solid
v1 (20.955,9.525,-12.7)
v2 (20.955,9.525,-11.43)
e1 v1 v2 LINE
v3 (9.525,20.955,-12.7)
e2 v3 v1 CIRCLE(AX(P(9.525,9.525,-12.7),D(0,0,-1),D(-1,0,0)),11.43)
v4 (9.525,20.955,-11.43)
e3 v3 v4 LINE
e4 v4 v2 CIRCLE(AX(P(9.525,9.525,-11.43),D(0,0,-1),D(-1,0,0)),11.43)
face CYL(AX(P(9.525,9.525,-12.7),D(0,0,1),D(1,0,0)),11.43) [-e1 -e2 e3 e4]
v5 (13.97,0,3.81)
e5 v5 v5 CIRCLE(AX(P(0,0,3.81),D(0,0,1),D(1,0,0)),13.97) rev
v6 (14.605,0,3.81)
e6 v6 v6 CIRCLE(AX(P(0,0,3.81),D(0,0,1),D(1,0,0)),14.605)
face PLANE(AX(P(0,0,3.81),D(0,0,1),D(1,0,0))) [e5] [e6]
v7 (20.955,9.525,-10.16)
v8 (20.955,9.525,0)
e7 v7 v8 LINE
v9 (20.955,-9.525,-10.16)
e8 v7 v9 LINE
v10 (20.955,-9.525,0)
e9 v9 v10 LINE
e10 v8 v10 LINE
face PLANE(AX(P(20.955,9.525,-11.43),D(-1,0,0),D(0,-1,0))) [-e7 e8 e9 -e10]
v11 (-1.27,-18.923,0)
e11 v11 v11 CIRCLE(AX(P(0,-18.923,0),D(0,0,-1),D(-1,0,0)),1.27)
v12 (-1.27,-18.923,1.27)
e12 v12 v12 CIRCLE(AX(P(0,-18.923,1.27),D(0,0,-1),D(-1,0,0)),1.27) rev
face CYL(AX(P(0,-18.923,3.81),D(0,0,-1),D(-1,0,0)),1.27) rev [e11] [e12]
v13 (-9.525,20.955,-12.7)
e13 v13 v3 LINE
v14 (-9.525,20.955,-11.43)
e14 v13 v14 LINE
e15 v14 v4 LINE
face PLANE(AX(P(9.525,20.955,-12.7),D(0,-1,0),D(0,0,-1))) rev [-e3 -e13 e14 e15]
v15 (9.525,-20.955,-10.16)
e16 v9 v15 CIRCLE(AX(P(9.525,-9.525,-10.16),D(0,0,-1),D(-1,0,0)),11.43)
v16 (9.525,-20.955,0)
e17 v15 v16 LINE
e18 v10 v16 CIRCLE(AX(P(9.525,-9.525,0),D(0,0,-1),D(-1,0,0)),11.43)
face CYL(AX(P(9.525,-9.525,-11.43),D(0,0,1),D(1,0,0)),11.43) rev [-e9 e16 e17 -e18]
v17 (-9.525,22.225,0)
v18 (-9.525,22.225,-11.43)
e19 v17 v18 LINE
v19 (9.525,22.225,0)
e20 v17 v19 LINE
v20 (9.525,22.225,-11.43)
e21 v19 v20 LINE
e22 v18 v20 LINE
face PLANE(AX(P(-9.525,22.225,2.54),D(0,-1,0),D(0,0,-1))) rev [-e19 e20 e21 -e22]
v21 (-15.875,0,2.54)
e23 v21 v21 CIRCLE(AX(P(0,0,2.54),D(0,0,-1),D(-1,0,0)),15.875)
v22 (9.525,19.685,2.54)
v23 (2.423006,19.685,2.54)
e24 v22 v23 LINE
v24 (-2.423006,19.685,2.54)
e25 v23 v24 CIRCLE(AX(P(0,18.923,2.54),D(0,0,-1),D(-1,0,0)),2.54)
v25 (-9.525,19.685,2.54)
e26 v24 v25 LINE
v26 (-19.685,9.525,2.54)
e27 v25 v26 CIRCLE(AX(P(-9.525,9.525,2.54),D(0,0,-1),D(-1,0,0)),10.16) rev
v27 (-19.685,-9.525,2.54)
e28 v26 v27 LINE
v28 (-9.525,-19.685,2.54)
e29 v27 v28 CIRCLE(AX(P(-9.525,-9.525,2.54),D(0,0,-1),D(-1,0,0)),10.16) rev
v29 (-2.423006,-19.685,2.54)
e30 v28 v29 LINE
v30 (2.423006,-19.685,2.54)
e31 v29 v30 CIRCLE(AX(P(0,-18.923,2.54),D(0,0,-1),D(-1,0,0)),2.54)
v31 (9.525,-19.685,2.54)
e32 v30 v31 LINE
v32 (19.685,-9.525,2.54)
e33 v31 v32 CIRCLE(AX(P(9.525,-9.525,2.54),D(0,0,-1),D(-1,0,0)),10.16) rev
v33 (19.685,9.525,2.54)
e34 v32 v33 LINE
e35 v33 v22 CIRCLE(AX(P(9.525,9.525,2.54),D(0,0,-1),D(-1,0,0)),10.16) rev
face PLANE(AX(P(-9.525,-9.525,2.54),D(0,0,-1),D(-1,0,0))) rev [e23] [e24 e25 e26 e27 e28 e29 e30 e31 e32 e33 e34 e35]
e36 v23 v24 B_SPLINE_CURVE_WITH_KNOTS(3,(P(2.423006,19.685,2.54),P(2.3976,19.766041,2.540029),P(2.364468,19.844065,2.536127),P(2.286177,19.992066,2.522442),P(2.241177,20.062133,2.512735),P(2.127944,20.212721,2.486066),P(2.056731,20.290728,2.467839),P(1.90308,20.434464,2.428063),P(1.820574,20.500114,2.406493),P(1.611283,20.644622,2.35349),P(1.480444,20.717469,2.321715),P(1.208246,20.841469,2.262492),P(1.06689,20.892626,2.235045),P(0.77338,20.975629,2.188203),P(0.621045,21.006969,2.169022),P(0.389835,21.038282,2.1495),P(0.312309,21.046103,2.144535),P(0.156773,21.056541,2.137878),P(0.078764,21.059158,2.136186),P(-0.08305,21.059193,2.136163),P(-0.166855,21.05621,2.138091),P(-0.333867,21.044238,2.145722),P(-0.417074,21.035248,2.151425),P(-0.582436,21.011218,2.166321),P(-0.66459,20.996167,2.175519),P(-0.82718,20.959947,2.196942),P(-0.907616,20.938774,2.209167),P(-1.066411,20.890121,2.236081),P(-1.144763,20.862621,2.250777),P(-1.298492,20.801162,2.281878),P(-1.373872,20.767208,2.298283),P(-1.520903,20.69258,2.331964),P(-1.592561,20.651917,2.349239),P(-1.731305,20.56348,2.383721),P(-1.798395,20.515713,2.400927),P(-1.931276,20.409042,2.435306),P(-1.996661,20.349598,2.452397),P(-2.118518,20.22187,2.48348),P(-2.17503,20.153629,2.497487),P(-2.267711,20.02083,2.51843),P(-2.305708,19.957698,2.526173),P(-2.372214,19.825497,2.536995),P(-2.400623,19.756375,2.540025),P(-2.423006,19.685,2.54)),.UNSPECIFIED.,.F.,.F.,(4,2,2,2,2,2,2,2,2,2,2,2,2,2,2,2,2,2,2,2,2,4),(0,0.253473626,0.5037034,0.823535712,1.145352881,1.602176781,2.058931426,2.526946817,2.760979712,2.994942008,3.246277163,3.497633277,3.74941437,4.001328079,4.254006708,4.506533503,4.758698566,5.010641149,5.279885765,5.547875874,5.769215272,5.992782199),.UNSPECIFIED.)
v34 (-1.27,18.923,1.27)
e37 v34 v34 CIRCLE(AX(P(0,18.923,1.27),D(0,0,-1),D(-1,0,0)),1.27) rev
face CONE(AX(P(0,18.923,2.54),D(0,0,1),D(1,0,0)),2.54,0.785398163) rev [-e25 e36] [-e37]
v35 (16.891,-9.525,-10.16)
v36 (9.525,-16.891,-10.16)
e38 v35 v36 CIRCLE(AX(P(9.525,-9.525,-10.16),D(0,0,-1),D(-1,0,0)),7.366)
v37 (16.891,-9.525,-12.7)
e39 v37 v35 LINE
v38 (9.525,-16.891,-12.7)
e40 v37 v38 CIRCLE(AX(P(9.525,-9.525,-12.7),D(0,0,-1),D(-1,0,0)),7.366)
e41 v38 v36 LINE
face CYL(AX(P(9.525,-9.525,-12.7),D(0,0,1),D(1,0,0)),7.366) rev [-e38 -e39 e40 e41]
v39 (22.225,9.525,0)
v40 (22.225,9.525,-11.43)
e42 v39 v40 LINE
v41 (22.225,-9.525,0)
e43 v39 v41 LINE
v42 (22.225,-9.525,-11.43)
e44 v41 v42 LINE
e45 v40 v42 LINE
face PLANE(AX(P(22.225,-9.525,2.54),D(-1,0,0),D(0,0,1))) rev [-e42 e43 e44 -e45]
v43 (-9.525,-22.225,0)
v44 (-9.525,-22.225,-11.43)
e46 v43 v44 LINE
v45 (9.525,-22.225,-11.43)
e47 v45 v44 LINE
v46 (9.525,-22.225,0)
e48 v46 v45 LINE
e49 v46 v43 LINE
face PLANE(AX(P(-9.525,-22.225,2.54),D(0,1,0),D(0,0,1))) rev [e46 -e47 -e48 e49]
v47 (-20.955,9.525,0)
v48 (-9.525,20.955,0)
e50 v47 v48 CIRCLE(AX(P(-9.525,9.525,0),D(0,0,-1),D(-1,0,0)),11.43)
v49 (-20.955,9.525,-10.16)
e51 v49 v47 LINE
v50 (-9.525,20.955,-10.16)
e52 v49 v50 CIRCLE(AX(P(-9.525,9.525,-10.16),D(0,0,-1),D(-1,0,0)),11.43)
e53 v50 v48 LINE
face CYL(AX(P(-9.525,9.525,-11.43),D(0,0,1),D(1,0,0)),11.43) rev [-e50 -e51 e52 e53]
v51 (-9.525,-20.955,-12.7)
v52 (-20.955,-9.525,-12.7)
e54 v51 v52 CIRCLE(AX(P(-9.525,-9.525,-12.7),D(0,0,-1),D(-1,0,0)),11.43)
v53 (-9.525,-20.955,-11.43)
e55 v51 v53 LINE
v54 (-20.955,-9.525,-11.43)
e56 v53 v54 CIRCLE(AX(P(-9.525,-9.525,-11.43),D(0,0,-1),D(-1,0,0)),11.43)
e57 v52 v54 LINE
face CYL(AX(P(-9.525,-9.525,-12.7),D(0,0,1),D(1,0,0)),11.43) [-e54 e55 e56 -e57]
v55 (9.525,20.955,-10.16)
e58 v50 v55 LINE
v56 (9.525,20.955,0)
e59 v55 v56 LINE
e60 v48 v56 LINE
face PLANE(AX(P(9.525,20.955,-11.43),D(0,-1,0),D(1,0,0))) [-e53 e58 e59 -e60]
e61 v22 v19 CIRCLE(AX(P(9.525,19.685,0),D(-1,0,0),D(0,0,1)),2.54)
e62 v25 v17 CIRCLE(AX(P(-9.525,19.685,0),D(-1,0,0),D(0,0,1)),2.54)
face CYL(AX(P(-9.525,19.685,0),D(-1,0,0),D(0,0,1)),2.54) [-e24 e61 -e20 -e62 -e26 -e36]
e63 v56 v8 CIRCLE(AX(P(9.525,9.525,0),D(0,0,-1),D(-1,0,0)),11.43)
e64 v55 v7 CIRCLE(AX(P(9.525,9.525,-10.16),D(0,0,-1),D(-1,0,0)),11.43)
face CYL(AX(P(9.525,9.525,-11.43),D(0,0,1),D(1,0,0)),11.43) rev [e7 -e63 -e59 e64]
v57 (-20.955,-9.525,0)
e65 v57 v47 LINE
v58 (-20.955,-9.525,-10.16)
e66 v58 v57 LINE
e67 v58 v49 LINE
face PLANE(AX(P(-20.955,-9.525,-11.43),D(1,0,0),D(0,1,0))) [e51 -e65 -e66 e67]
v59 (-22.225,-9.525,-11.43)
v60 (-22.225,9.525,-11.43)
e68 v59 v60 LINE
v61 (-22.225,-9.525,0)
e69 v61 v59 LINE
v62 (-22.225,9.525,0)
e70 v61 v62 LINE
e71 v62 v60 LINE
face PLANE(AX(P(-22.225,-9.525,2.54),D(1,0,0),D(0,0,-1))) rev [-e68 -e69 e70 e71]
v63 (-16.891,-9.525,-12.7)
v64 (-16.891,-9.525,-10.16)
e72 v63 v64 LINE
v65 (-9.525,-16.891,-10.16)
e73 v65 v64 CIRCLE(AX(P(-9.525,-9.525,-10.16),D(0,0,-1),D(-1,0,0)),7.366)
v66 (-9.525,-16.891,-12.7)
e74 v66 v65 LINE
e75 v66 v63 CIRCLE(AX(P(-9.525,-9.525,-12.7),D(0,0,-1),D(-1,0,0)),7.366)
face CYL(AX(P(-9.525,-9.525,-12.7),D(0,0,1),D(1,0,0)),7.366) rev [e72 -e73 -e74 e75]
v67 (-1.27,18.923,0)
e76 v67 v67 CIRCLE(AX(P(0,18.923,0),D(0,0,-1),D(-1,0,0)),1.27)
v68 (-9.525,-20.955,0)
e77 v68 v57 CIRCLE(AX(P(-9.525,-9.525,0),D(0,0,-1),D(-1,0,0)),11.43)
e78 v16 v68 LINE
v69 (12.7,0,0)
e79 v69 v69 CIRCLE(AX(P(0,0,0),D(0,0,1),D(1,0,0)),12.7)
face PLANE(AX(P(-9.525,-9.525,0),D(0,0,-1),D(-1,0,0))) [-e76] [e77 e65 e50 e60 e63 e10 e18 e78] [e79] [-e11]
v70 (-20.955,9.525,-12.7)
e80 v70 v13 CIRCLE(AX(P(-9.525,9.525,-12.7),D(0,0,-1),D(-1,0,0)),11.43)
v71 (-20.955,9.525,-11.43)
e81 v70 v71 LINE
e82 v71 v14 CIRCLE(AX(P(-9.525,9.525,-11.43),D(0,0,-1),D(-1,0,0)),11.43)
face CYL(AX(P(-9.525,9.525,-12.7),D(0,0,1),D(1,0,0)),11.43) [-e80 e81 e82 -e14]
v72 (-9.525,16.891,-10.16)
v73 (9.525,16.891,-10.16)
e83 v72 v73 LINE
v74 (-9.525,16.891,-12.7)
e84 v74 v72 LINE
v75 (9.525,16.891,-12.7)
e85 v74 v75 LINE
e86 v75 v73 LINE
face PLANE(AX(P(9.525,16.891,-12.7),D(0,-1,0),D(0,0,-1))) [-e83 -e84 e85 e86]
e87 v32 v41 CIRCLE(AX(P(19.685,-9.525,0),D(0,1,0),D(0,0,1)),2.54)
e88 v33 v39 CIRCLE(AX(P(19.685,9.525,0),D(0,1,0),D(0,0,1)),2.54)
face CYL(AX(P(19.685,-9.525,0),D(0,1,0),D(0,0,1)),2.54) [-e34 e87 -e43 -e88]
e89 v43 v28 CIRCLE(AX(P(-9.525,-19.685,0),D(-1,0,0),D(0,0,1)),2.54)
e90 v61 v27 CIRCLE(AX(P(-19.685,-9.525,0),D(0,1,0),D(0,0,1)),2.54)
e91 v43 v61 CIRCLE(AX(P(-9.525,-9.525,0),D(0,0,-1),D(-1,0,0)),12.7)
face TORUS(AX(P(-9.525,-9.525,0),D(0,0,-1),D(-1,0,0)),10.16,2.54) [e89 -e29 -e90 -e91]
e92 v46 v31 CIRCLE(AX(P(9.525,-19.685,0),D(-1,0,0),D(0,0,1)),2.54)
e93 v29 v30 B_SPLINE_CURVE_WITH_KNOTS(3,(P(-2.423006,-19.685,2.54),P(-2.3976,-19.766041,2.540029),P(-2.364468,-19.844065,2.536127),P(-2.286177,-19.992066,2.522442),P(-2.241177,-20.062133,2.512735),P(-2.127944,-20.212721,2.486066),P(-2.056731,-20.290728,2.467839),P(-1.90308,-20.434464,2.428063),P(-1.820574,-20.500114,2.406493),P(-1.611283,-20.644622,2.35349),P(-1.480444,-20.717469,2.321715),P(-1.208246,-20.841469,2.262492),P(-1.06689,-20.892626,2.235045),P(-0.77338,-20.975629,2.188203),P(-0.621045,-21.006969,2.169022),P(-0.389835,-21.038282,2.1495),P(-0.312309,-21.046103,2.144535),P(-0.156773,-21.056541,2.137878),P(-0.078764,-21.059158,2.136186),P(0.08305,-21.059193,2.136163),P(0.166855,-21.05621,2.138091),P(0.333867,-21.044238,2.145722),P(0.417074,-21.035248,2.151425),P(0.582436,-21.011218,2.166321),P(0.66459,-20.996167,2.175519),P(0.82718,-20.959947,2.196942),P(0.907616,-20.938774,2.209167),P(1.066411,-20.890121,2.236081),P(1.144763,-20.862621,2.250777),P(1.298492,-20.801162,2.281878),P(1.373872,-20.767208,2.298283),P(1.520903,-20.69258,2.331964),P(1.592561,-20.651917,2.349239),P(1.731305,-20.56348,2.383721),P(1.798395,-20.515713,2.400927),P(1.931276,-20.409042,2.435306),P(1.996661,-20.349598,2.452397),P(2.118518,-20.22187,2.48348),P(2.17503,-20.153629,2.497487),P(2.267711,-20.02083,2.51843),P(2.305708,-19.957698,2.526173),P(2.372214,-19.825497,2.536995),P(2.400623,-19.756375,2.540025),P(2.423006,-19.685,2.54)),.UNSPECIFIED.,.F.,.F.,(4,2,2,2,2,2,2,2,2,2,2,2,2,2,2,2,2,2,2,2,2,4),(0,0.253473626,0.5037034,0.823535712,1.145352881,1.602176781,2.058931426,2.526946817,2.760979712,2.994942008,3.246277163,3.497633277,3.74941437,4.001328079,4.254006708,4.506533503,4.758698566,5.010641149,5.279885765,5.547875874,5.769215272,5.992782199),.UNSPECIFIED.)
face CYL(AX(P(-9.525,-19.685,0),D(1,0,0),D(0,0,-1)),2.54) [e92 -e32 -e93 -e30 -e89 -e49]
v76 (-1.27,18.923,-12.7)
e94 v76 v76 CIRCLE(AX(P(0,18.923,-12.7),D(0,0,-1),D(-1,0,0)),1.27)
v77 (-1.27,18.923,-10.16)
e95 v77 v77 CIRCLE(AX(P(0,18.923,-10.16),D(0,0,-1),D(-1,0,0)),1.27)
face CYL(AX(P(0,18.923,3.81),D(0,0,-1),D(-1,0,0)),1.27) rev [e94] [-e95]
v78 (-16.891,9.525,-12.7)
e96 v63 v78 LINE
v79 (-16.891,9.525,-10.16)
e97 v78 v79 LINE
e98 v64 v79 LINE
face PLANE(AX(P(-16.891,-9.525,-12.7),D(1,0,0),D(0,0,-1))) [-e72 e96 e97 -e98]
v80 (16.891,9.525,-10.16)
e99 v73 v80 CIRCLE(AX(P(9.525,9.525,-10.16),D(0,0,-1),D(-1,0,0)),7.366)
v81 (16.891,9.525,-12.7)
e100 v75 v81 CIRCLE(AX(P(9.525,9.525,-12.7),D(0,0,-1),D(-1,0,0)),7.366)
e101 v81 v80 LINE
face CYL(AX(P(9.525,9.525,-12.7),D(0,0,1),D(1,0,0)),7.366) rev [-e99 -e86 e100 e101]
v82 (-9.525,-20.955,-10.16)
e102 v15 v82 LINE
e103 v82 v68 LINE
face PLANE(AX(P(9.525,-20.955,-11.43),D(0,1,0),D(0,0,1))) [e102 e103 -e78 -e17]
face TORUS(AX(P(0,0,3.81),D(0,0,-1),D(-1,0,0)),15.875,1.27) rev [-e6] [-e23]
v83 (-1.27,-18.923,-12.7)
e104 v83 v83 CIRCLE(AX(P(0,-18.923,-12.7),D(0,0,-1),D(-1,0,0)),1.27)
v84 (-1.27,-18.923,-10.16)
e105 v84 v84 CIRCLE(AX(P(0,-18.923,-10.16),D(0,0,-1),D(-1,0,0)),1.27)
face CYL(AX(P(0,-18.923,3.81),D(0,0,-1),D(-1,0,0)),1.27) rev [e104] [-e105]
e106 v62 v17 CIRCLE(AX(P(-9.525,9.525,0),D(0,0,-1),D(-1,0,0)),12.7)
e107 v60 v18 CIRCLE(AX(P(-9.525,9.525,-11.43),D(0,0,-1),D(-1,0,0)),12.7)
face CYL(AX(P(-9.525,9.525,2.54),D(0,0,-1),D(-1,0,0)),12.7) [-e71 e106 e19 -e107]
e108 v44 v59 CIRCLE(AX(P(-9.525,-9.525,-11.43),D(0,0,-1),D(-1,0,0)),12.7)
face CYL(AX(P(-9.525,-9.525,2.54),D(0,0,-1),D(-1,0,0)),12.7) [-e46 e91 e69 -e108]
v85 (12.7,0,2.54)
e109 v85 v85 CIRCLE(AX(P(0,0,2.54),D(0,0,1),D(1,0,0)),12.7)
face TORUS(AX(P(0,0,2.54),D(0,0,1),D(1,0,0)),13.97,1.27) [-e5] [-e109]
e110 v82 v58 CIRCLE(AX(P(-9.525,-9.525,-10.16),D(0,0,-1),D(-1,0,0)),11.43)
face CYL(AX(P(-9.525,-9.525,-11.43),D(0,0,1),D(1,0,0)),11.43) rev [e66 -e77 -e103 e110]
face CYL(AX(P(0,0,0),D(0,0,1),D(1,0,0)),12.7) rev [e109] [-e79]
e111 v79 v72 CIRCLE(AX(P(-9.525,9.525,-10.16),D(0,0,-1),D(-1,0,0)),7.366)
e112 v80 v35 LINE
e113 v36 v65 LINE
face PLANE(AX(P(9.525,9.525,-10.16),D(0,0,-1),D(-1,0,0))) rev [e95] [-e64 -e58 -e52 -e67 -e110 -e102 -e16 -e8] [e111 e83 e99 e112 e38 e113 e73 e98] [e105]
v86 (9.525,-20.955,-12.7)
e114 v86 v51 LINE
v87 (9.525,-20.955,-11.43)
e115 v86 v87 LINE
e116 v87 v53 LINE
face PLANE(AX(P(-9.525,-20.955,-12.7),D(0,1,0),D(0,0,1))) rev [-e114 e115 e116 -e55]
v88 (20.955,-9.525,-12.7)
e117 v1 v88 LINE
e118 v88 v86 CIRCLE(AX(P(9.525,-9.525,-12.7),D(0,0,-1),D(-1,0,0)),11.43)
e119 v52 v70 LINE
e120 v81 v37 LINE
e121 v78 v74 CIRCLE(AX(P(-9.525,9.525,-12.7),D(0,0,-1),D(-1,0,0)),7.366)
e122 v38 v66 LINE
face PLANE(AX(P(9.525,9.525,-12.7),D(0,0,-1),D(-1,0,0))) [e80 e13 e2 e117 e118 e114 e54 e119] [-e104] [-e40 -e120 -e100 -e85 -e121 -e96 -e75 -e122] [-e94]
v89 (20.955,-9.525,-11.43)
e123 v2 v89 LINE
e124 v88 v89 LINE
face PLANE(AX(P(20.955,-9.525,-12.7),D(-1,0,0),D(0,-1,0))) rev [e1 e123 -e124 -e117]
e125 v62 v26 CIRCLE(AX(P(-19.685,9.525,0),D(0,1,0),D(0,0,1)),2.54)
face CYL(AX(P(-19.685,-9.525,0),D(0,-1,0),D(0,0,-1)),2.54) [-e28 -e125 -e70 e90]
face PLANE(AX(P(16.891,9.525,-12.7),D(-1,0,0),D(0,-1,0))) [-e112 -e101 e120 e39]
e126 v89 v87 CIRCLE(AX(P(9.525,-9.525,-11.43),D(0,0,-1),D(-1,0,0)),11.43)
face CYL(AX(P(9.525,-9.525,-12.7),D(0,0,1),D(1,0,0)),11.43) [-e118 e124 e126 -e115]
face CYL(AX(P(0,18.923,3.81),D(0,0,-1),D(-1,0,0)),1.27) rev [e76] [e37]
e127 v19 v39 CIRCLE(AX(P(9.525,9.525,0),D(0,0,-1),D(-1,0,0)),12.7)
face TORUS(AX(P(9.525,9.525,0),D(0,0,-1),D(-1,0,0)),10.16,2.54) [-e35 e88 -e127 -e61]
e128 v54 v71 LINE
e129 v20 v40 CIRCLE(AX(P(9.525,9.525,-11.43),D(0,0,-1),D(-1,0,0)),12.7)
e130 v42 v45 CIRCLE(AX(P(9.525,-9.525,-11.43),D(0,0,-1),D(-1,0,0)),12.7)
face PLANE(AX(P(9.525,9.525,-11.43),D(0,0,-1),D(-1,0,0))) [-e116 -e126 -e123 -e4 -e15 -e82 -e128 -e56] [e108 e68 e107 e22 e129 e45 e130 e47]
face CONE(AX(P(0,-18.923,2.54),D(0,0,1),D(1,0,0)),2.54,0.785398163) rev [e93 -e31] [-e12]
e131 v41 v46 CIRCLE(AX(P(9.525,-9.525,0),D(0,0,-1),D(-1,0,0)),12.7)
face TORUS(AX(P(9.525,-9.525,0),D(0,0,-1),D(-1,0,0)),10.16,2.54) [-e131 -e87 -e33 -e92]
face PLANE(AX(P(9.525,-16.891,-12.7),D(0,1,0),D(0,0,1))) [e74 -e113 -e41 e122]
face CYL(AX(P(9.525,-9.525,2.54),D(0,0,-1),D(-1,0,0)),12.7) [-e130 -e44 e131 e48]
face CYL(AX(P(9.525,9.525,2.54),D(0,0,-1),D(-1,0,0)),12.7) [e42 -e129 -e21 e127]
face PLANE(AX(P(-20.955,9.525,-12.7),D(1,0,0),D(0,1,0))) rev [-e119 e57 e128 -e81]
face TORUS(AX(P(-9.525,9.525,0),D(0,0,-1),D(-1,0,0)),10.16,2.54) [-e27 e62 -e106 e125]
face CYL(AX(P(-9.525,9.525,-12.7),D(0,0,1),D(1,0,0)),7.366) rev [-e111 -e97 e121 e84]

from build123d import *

# Parameters (mm, degrees)
BOSS_EXTRUDE1_DEPTH     = 2.54
SKETCH3_R               = 14.605
BOSS_EXTRUDE2_DEPTH     = 1.27
CUT_EXTRUDE1_DEPTH      = 32.66097519
CUT_EXTRUDE1_DEPTH_BACK = 32.66097519
SKETCH4_R               = 12.7
BOSS_EXTRUDE3_START     = 11.43
BOSS_EXTRUDE3_DEPTH     = 11.43
BOSS_EXTRUDE5_START     = 1.27
BOSS_EXTRUDE5_DEPTH     = 2.54
FILLET2_R               = 1.27
CUT_EXTRUDE2_DEPTH      = 36.503258301
CUT_EXTRUDE2_DEPTH_BACK = 36.503258301
SKETCH7_R               = 1.27
CHAMFER1_SIZE           = 1.27
FILLET3_R               = 2.54


# Some blends are built 0.0001 mm under size
with BuildPart() as part:
    # Sketch2 → Boss-Extrude1 (new body)
    with BuildSketch(Plane.XY):
        with BuildLine():
            Line((-9.525, -22.225), (9.525, -22.225))
            ThreePointArc((9.525, -22.225), (18.505256121, -18.505256121), (22.225, -9.525))
            Line((22.225, -9.525), (22.225, 9.525))
            ThreePointArc((22.225, 9.525), (18.505256121, 18.505256121), (9.525, 22.225))
            Line((9.525, 22.225), (-9.525, 22.225))
            ThreePointArc((-9.525, 22.225), (-18.505256121, 18.505256121), (-22.225, 9.525))
            Line((-22.225, 9.525), (-22.225, -9.525))
            ThreePointArc((-22.225, -9.525), (-18.505256121, -18.505256121), (-9.525, -22.225))
        make_face()
    extrude(amount=BOSS_EXTRUDE1_DEPTH)

    # Sketch3 → Boss-Extrude2 (add)
    with BuildSketch(Plane.XY.offset(2.54)):
        Circle(SKETCH3_R)
    extrude(amount=BOSS_EXTRUDE2_DEPTH)

    # Sketch4 → Cut-Extrude1 (cut, two sides: drawn at the far end of the back side and taken through both)
    with BuildSketch(Plane.XY.offset(3.81).offset(-CUT_EXTRUDE1_DEPTH_BACK)):
        Circle(SKETCH4_R)
    extrude(amount=CUT_EXTRUDE1_DEPTH + CUT_EXTRUDE1_DEPTH_BACK, mode=Mode.SUBTRACT)

    # Sketch5 → Boss-Extrude3 (add)
    with BuildSketch(Plane(origin=(0, 0, 0), x_dir=(-1, 0, 0), z_dir=(0, 0, -1)).offset(BOSS_EXTRUDE3_START)):
        with BuildLine():
            Line((-22.225, 9.525), (-22.225, -9.525))
            ThreePointArc((-22.225, -9.525), (-18.505256121, -18.505256121), (-9.525, -22.225))
            Line((-9.525, -22.225), (9.525, -22.225))
            ThreePointArc((9.525, -22.225), (18.505256121, -18.505256121), (22.225, -9.525))
            Line((22.225, -9.525), (22.225, 9.525))
            ThreePointArc((22.225, 9.525), (18.505256121, 18.505256121), (9.525, 22.225))
            Line((9.525, 22.225), (-9.525, 22.225))
            ThreePointArc((-9.525, 22.225), (-18.505256121, 18.505256121), (-22.225, 9.525))
        make_face()
        with BuildLine():
            Line((-9.525, 20.955), (9.525, 20.955))
            ThreePointArc((9.525, 20.955), (17.607230509, 17.607230509), (20.955, 9.525))
            Line((20.955, 9.525), (20.955, -9.525))
            ThreePointArc((20.955, -9.525), (17.607230509, -17.607230509), (9.525, -20.955))
            Line((9.525, -20.955), (-9.525, -20.955))
            ThreePointArc((-9.525, -20.955), (-17.607230509, -17.607230509), (-20.955, -9.525))
            Line((-20.955, -9.525), (-20.955, 9.525))
            ThreePointArc((-20.955, 9.525), (-17.607230509, 17.607230509), (-9.525, 20.955))
        make_face(mode=Mode.SUBTRACT)
    extrude(amount=-BOSS_EXTRUDE3_DEPTH)

    # Sketch6 → Boss-Extrude5 (add)
    with BuildSketch(Plane(origin=(0, 0, -11.43), x_dir=(-1, 0, 0), z_dir=(0, 0, -1)).offset(BOSS_EXTRUDE5_START)):
        with BuildLine():
            Line((-9.525, 20.955), (9.525, 20.955))
            ThreePointArc((9.525, 20.955), (17.607230509, 17.607230509), (20.955, 9.525))
            Line((20.955, 9.525), (20.955, -9.525))
            ThreePointArc((20.955, -9.525), (17.607230509, -17.607230509), (9.525, -20.955))
            Line((9.525, -20.955), (-9.525, -20.955))
            ThreePointArc((-9.525, -20.955), (-17.607230509, -17.607230509), (-20.955, -9.525))
            Line((-20.955, -9.525), (-20.955, 9.525))
            ThreePointArc((-20.955, 9.525), (-17.607230509, 17.607230509), (-9.525, 20.955))
        make_face()
        with BuildLine():
            Line((-9.525, 16.891), (9.525, 16.891))
            ThreePointArc((9.525, 16.891), (14.73354855, 14.73354855), (16.891, 9.525))
            Line((16.891, 9.525), (16.891, -9.525))
            ThreePointArc((16.891, -9.525), (14.73354855, -14.73354855), (9.525, -16.891))
            Line((9.525, -16.891), (-9.525, -16.891))
            ThreePointArc((-9.525, -16.891), (-14.73354855, -14.73354855), (-16.891, -9.525))
            Line((-16.891, -9.525), (-16.891, 9.525))
            ThreePointArc((-16.891, 9.525), (-14.73354855, 14.73354855), (-9.525, 16.891))
        make_face(mode=Mode.SUBTRACT)
    extrude(amount=-BOSS_EXTRUDE5_DEPTH)

    # Fillet2
    fillet2_edges = [part.edges().sort_by_distance(p)[0] for p in [
        (-14.605, 0, 2.54),
        (-12.7, 0, 3.81),
    ]]
    fillet(fillet2_edges, radius=FILLET2_R - 0.0001)  # a hair under: the kernel refuses the full size

    # Sketch7 → Cut-Extrude2 (cut, two sides: drawn at the far end of the back side and taken through both)
    with BuildSketch(Plane(origin=(0, 0, -12.7), x_dir=(-1, 0, 0), z_dir=(0, 0, -1)).offset(-CUT_EXTRUDE2_DEPTH_BACK)):
        with Locations((0, 18.923)):
            Circle(SKETCH7_R)
        with Locations((0, -18.923)):
            Circle(SKETCH7_R)
    extrude(amount=CUT_EXTRUDE2_DEPTH + CUT_EXTRUDE2_DEPTH_BACK, mode=Mode.SUBTRACT)

    # Chamfer1
    chamfer1_edges = [part.edges().sort_by_distance(p)[0] for p in [
        (1.27, 18.923, 2.54),
        (1.27, -18.923, 2.54),
    ]]
    chamfer(chamfer1_edges, length=CHAMFER1_SIZE)

    # Fillet3
    # the kernel refuses this fillet: 2.54 mm, written as the material it takes off along each edge
    with BuildSketch(Plane(origin=(9.525, -9.525, 2.54), x_dir=(0, -1, 0), z_dir=(-1, 0, 0))) as fillet3_piece_1:
        with BuildLine():
            CenterArc((12.7 - FILLET3_R, -FILLET3_R), FILLET3_R, 0, 90)
            Line((12.7, -FILLET3_R), (12.7, 0))
            Line((12.7, 0), (12.7 - FILLET3_R, 0))
        make_face()
    revolve(axis=Axis((9.525, -9.525, 2.54), (0, 0, 1)), revolution_arc=90, mode=Mode.SUBTRACT)
    with BuildSketch(Plane(origin=(22.225, -9.525, 2.54), x_dir=(-1, 0, 0), z_dir=(0, 1, 0)), Plane(origin=(9.525, 22.225, 2.54), x_dir=(0, -1, 0), z_dir=(-1, 0, 0)), Plane(origin=(-22.225, 9.525, 2.54), x_dir=(1, 0, 0), z_dir=(0, -1, 0)), Plane(origin=(-9.525, -22.225, 2.54), x_dir=(0, 1, 0), z_dir=(1, 0, 0))) as fillet3_piece_2:
        with BuildLine():
            CenterArc((FILLET3_R, -FILLET3_R), FILLET3_R, 90, 90)
            Line((0, -FILLET3_R), (0, 0))
            Line((0, 0), (FILLET3_R, 0))
        make_face()
    extrude(amount=19.05, mode=Mode.SUBTRACT)
    with BuildSketch(Plane(origin=(9.525, 9.525, 2.54), x_dir=(1, 0, 0), z_dir=(0, -1, 0))) as fillet3_piece_3:
        with BuildLine():
            CenterArc((12.7 - FILLET3_R, -FILLET3_R), FILLET3_R, 0, 90)
            Line((12.7, -FILLET3_R), (12.7, 0))
            Line((12.7, 0), (12.7 - FILLET3_R, 0))
        make_face()
    revolve(axis=Axis((9.525, 9.525, 2.54), (0, 0, 1)), revolution_arc=90, mode=Mode.SUBTRACT)
    with BuildSketch(Plane(origin=(-9.525, 9.525, 2.54), x_dir=(0, 1, 0), z_dir=(1, 0, 0))) as fillet3_piece_4:
        with BuildLine():
            CenterArc((12.7 - FILLET3_R, -FILLET3_R), FILLET3_R, 0, 90)
            Line((12.7, -FILLET3_R), (12.7, 0))
            Line((12.7, 0), (12.7 - FILLET3_R, 0))
        make_face()
    revolve(axis=Axis((-9.525, 9.525, 2.54), (0, 0, 1)), revolution_arc=90, mode=Mode.SUBTRACT)
    with BuildSketch(Plane(origin=(-9.525, -9.525, 2.54), x_dir=(-1, 0, 0), z_dir=(0, 1, 0))) as fillet3_piece_5:
        with BuildLine():
            CenterArc((12.7 - FILLET3_R, -FILLET3_R), FILLET3_R, 0, 90)
            Line((12.7, -FILLET3_R), (12.7, 0))
            Line((12.7, 0), (12.7 - FILLET3_R, 0))
        make_face()
    revolve(axis=Axis((-9.525, -9.525, 2.54), (0, 0, 1)), revolution_arc=90, mode=Mode.SUBTRACT)


solid = part.part
